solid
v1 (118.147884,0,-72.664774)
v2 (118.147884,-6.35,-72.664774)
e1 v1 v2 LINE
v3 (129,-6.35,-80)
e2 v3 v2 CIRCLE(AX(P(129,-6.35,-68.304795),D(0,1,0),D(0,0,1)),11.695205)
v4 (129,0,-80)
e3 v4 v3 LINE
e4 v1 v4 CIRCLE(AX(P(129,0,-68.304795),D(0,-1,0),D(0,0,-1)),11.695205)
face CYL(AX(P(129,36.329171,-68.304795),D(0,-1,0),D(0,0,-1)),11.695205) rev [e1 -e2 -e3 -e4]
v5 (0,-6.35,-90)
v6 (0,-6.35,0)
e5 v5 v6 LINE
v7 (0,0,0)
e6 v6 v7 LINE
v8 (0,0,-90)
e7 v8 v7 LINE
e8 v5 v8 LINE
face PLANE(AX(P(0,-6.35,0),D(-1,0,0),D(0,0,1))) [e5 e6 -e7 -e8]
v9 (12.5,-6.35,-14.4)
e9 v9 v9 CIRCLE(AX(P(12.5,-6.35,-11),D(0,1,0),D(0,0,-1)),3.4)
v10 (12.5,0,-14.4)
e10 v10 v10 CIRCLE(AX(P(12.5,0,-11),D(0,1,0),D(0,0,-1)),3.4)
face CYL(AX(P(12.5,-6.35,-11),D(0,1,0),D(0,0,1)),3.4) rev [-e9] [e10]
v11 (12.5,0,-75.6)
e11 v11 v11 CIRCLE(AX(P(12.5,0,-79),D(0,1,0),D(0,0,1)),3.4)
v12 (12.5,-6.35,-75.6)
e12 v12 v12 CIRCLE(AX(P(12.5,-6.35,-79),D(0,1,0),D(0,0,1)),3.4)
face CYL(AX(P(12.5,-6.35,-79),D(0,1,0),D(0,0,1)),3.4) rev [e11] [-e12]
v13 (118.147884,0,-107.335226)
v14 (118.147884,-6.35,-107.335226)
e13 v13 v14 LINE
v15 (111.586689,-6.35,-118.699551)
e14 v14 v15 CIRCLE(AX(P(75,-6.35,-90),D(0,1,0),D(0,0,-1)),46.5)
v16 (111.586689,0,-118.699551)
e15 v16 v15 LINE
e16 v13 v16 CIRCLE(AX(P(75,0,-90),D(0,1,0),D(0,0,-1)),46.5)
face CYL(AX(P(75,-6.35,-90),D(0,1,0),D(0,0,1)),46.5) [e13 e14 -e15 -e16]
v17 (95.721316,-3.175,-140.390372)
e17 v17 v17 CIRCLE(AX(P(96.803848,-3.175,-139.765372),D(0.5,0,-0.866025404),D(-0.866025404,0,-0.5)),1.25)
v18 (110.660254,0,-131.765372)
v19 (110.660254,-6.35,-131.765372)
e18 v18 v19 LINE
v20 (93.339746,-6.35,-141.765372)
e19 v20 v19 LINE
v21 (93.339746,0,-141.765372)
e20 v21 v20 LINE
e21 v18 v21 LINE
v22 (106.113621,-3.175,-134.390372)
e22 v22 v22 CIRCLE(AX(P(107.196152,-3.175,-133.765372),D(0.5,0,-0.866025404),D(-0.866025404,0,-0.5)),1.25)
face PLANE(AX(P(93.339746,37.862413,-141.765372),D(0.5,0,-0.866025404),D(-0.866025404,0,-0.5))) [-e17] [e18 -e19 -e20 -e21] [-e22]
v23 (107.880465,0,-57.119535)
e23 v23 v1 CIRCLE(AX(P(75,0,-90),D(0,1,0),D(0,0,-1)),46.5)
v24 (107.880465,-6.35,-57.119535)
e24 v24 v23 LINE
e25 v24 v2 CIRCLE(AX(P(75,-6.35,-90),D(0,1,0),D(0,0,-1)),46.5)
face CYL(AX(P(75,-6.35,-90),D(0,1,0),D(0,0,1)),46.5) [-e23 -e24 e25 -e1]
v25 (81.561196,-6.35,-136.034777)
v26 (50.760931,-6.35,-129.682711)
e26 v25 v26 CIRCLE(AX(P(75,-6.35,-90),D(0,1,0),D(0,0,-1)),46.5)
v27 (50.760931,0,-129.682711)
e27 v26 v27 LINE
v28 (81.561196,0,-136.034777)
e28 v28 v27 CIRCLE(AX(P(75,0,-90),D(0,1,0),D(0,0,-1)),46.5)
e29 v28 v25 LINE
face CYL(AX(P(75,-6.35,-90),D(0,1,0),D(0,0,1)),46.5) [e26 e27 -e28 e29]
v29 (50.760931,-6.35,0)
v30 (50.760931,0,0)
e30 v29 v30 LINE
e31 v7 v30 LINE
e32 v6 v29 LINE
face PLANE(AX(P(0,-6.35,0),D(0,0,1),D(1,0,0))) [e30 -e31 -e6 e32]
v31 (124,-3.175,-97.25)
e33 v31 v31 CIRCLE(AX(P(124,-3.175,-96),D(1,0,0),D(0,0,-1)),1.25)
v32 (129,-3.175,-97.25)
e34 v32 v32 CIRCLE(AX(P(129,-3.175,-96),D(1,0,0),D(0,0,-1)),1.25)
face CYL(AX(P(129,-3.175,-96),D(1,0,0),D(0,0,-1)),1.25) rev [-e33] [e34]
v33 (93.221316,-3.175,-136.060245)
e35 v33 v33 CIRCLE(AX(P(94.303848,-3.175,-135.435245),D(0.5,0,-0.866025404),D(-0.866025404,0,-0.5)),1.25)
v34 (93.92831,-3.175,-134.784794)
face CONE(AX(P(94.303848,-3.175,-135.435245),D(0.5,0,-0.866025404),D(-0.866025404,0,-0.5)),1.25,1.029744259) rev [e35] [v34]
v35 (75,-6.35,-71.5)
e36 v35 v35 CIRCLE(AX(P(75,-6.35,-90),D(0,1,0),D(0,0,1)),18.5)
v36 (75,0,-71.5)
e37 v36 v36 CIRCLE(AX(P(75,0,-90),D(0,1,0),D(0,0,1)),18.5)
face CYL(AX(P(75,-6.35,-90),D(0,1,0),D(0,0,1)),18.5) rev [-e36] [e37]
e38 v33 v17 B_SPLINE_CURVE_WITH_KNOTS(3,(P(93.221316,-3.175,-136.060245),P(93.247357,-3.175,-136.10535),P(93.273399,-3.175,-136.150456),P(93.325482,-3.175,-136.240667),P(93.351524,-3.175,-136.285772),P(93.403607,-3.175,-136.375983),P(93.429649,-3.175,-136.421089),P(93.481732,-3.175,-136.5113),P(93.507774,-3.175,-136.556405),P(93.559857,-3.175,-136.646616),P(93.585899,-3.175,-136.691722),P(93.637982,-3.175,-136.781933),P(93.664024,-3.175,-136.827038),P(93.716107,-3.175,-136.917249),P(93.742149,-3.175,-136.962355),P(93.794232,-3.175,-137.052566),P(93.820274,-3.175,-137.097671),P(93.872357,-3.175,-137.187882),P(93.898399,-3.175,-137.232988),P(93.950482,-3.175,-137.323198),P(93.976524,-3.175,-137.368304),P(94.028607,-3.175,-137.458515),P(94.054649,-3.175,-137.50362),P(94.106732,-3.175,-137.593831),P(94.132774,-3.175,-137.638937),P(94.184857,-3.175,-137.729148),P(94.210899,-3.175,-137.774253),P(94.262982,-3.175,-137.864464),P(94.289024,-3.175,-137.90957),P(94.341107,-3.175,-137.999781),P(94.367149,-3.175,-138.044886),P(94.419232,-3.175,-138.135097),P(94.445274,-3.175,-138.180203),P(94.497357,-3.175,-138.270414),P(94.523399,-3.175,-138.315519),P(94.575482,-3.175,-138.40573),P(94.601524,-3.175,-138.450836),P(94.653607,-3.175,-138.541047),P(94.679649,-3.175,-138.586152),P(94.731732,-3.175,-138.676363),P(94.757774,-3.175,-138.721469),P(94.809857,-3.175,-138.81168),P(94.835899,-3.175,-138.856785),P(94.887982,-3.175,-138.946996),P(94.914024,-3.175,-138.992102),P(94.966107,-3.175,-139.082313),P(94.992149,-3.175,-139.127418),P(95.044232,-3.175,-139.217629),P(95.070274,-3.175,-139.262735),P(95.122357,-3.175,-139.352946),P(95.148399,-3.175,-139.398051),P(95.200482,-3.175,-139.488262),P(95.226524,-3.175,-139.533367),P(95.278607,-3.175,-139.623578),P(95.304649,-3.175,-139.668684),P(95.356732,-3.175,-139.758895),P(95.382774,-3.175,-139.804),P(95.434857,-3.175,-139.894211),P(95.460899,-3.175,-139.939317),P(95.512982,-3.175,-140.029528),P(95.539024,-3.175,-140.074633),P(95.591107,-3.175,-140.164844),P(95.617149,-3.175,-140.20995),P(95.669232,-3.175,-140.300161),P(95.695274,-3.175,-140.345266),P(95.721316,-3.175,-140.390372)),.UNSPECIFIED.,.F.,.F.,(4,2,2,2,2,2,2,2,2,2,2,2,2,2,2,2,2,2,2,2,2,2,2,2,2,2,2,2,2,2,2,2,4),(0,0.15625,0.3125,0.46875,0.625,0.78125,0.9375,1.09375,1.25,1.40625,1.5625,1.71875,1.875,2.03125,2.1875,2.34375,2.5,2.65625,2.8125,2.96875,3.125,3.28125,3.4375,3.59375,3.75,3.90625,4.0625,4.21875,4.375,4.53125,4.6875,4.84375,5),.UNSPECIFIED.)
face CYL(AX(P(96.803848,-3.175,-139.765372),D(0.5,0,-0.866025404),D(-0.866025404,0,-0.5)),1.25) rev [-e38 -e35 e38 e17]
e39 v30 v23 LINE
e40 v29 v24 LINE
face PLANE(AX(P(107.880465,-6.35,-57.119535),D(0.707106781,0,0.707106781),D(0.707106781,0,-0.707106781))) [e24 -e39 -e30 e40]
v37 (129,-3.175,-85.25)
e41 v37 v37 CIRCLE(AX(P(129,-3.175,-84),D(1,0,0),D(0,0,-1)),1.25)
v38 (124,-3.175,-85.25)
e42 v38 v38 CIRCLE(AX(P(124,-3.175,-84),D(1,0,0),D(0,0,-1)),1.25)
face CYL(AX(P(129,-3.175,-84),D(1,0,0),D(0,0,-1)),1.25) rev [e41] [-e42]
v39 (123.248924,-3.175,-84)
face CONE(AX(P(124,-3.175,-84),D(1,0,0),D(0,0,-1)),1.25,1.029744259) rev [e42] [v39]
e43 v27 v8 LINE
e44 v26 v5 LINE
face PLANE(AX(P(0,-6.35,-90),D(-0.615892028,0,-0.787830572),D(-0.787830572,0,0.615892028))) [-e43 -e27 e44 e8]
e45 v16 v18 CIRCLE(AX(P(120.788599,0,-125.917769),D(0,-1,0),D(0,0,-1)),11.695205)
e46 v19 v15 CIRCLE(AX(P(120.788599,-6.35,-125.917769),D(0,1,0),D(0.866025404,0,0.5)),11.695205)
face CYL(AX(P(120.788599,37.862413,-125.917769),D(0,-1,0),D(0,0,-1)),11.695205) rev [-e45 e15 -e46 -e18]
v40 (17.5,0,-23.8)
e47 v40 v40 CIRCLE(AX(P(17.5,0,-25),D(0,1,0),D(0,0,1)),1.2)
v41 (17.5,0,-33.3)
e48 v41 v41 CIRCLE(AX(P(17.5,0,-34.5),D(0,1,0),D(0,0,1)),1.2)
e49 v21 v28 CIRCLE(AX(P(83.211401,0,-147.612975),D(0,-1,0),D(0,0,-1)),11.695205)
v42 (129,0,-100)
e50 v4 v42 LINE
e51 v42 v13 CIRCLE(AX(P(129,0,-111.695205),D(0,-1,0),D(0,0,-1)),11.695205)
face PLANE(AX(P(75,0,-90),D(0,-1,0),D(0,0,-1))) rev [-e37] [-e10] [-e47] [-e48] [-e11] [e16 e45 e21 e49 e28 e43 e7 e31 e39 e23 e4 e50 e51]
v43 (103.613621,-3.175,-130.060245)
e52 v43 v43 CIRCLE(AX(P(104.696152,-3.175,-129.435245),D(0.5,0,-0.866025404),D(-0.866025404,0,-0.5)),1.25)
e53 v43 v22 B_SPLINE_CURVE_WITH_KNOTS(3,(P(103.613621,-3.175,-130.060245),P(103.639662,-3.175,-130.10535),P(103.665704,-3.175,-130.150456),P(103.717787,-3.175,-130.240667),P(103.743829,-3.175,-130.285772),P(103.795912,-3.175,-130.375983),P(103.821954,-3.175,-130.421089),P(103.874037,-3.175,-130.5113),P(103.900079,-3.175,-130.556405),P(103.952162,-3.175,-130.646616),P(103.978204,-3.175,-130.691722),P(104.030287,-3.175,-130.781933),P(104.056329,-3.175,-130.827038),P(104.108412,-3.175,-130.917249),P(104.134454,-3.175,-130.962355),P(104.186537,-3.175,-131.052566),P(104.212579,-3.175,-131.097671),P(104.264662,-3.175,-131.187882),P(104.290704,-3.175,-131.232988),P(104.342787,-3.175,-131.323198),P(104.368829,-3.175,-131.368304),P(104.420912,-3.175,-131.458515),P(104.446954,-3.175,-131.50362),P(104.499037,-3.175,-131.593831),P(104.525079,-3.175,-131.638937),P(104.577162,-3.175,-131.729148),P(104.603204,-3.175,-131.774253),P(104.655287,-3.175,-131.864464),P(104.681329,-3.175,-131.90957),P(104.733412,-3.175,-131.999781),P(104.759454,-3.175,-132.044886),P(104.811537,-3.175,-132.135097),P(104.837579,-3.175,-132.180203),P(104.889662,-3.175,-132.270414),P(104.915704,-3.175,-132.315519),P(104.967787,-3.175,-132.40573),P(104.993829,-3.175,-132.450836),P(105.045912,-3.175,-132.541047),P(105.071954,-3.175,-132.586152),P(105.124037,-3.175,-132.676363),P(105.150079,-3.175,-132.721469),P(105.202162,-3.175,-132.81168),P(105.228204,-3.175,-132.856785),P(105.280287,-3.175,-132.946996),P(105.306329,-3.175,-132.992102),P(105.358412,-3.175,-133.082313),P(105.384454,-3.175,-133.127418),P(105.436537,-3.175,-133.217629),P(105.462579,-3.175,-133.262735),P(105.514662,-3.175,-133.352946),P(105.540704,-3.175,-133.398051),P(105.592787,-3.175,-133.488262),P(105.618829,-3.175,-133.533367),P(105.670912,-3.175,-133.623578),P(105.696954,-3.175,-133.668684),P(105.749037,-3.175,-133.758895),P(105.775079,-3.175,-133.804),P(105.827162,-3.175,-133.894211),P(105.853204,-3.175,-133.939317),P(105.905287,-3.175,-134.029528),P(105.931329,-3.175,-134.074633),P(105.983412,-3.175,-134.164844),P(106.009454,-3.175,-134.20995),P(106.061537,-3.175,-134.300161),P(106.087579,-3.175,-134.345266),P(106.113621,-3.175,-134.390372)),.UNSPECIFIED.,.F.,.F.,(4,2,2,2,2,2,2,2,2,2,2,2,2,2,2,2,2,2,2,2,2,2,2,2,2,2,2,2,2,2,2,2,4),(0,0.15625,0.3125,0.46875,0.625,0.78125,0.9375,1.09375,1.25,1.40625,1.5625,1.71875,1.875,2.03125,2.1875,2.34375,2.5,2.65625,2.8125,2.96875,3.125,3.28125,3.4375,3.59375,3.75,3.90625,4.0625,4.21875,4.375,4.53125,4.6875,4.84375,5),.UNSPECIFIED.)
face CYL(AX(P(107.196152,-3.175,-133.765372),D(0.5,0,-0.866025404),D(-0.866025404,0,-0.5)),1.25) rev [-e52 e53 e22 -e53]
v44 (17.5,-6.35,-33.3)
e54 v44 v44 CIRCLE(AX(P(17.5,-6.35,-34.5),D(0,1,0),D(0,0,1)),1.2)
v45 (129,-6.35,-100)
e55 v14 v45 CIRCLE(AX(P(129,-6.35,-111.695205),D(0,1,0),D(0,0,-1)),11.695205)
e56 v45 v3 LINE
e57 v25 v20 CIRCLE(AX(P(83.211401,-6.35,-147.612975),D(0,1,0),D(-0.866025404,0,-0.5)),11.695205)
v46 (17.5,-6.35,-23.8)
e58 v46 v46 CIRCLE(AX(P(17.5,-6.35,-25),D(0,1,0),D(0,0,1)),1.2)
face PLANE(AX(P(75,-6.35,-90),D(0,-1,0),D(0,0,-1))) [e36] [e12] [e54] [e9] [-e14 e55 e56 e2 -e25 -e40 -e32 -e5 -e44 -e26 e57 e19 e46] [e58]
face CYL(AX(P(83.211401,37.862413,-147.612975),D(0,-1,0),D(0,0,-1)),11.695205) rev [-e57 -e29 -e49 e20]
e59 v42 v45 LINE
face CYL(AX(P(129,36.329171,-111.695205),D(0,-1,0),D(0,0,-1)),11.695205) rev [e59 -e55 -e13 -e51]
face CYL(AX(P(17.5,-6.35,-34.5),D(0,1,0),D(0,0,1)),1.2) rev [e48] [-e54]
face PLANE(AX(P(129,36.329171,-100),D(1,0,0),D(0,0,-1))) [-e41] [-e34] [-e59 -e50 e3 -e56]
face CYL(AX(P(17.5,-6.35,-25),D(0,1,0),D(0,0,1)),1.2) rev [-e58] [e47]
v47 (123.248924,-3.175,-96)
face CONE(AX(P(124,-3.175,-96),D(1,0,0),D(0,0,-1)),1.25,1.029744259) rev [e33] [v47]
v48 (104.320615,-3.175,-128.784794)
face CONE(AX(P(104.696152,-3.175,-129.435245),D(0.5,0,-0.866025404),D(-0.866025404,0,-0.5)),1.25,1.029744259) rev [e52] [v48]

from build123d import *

# Parameters (mm, degrees)
BASE_FLANGE1_DEPTH                   = 6.35
SKETCH8_R                            = 3.4
CUT_EXTRUDE1_DEPTH                   = 183.851914127
SKETCH9_R                            = 18.5
CUT_EXTRUDE2_DEPTH                   = 183.851914127
SKETCH11_R                           = 1.2
CUT_EXTRUDE4_DEPTH                   = 183.851914127
BOSS_EXTRUDE2_START                  = -6.35
BOSS_EXTRUDE2_DEPTH                  = 6.35
TAP_DRILL_FOR_M3X0_5_TAP2_AT_2_COUNT = 2
TAP_DRILL_FOR_M3X0_5_TAP2_AT_2_PITCH = 12
CIRPATTERN3_COUNT                    = 2
CIRPATTERN3_ANGLE                    = 60


# Sheet-metal steps are written as plain solids
with BuildPart() as part:
    # Sketch2 → Base-Flange1 (new body)
    with BuildSketch(Plane(origin=(0, 0, 0), x_dir=(1, 0, 0), z_dir=(0, 1, 0))):
        with BuildLine():
            Line((0, 0), (50.76093065, 0))
            Line((50.76093065, 0), (107.880465325, 57.119534675))
            ThreePointArc((107.880465325, 57.119534675), (111.537953618, 118.761570635), (50.76093065, 129.682710556))
            Line((50.76093065, 129.682710556), (0, 90))
            Line((0, 90), (0, 0))
        make_face()
    extrude(amount=-BASE_FLANGE1_DEPTH)

    # Sketch8 → Cut-Extrude1 (cut, through all)
    with BuildSketch(Plane(origin=(0, 0, 0), x_dir=(1, 0, 0), z_dir=(0, 1, 0))):
        with Locations(Location((12.5, 79, 0), (0, 0, 270))):
            Circle(SKETCH8_R)
        with Locations(Location((12.5, 11, 0), (0, 0, 90))):
            Circle(SKETCH8_R)
    extrude(amount=-CUT_EXTRUDE1_DEPTH, mode=Mode.SUBTRACT)

    # Sketch9 → Cut-Extrude2 (cut, through all)
    with BuildSketch(Plane(origin=(0, 0, 0), x_dir=(1, 0, 0), z_dir=(0, 1, 0))):
        with Locations(Location((75, 90, 0), (0, 0, 270))):
            Circle(SKETCH9_R)
    extrude(amount=-CUT_EXTRUDE2_DEPTH, mode=Mode.SUBTRACT)

    # Sketch11 → Cut-Extrude4 (cut, through all)
    with BuildSketch(Plane(origin=(0, 0, 0), x_dir=(1, 0, 0), z_dir=(0, 1, 0))):
        with Locations(Location((17.5, 25, 0), (0, 0, 270))):
            Circle(SKETCH11_R)
        with Locations(Location((17.5, 34.5, 0), (0, 0, 270))):
            Circle(SKETCH11_R)
    extrude(amount=-CUT_EXTRUDE4_DEPTH, mode=Mode.SUBTRACT)

    # Sketch15 → Boss-Extrude2 (add)
    with BuildSketch(Plane.XZ.offset(6.35).offset(BOSS_EXTRUDE2_START)):
        with BuildLine():
            Line((129, -100), (129, -80))
            ThreePointArc((129, -80), (122.450687881, -77.994187792), (118.147884423, -72.66477373))
            ThreePointArc((118.147884423, -72.66477373), (121.5, -90), (118.147884423, -107.33522627))
            ThreePointArc((118.147884423, -107.33522627), (122.450687881, -102.005812208), (129, -100))
        make_face()
    boss_extrude2 = extrude(amount=BOSS_EXTRUDE2_DEPTH)

    # Sketch17 → Tap Drill for M3x0.5 Tap2 (revolve, cut)
    with BuildSketch(Plane(origin=(129, -3.175, -84), x_dir=(0, 0, -1), z_dir=(0, 1, 0))):
        Polygon((0, 0), (0, 5.751075774), (1.25, 5), (1.25, 0), align=None)
    tap_drill_for_m3x0_5_tap2 = revolve(axis=Axis((135.35, -3.175, -84), (-1, 0, 0)), mode=Mode.SUBTRACT)

    # Tap Drill for M3x0.5 Tap2 at 2: Tap Drill for M3x0.5 Tap2 ×2
    with Locations(*[(0, 0, -i * TAP_DRILL_FOR_M3X0_5_TAP2_AT_2_PITCH) for i in range(1, TAP_DRILL_FOR_M3X0_5_TAP2_AT_2_COUNT)]):
        add(tap_drill_for_m3x0_5_tap2, mode=Mode.SUBTRACT)

    # CirPattern3: Boss-Extrude2, Tap Drill for M3x0.5 Tap2 ×2 about axis
    cirpattern3_axis = Axis((75, 0, -90), (0, 1, 0))
    add([boss_extrude2.rotate(cirpattern3_axis, i * CIRPATTERN3_ANGLE / (CIRPATTERN3_COUNT - 1)) for i in range(1, CIRPATTERN3_COUNT)])
    add([tap_drill_for_m3x0_5_tap2.rotate(cirpattern3_axis, i * CIRPATTERN3_ANGLE / (CIRPATTERN3_COUNT - 1)) for i in range(1, CIRPATTERN3_COUNT)], mode=Mode.SUBTRACT)

    # CirPattern3 copy 1 sketch → CirPattern3 copy 1 (revolve, cut)
    with BuildSketch(Plane(origin=(96.803847577, -3.175, -139.765371804), x_dir=(-0.8660254037844399, 0, -0.4999999999999978), z_dir=(0, 1, 0))):
        Polygon((0, 0), (0, 5.751075774), (1.25, 5), (1.25, 0), align=None)
    revolve(axis=Axis((99.978847577, -3.175, -145.264633118), (-0.4999999999999978, 0, 0.8660254037844399)), mode=Mode.SUBTRACT)


solid = part.part
